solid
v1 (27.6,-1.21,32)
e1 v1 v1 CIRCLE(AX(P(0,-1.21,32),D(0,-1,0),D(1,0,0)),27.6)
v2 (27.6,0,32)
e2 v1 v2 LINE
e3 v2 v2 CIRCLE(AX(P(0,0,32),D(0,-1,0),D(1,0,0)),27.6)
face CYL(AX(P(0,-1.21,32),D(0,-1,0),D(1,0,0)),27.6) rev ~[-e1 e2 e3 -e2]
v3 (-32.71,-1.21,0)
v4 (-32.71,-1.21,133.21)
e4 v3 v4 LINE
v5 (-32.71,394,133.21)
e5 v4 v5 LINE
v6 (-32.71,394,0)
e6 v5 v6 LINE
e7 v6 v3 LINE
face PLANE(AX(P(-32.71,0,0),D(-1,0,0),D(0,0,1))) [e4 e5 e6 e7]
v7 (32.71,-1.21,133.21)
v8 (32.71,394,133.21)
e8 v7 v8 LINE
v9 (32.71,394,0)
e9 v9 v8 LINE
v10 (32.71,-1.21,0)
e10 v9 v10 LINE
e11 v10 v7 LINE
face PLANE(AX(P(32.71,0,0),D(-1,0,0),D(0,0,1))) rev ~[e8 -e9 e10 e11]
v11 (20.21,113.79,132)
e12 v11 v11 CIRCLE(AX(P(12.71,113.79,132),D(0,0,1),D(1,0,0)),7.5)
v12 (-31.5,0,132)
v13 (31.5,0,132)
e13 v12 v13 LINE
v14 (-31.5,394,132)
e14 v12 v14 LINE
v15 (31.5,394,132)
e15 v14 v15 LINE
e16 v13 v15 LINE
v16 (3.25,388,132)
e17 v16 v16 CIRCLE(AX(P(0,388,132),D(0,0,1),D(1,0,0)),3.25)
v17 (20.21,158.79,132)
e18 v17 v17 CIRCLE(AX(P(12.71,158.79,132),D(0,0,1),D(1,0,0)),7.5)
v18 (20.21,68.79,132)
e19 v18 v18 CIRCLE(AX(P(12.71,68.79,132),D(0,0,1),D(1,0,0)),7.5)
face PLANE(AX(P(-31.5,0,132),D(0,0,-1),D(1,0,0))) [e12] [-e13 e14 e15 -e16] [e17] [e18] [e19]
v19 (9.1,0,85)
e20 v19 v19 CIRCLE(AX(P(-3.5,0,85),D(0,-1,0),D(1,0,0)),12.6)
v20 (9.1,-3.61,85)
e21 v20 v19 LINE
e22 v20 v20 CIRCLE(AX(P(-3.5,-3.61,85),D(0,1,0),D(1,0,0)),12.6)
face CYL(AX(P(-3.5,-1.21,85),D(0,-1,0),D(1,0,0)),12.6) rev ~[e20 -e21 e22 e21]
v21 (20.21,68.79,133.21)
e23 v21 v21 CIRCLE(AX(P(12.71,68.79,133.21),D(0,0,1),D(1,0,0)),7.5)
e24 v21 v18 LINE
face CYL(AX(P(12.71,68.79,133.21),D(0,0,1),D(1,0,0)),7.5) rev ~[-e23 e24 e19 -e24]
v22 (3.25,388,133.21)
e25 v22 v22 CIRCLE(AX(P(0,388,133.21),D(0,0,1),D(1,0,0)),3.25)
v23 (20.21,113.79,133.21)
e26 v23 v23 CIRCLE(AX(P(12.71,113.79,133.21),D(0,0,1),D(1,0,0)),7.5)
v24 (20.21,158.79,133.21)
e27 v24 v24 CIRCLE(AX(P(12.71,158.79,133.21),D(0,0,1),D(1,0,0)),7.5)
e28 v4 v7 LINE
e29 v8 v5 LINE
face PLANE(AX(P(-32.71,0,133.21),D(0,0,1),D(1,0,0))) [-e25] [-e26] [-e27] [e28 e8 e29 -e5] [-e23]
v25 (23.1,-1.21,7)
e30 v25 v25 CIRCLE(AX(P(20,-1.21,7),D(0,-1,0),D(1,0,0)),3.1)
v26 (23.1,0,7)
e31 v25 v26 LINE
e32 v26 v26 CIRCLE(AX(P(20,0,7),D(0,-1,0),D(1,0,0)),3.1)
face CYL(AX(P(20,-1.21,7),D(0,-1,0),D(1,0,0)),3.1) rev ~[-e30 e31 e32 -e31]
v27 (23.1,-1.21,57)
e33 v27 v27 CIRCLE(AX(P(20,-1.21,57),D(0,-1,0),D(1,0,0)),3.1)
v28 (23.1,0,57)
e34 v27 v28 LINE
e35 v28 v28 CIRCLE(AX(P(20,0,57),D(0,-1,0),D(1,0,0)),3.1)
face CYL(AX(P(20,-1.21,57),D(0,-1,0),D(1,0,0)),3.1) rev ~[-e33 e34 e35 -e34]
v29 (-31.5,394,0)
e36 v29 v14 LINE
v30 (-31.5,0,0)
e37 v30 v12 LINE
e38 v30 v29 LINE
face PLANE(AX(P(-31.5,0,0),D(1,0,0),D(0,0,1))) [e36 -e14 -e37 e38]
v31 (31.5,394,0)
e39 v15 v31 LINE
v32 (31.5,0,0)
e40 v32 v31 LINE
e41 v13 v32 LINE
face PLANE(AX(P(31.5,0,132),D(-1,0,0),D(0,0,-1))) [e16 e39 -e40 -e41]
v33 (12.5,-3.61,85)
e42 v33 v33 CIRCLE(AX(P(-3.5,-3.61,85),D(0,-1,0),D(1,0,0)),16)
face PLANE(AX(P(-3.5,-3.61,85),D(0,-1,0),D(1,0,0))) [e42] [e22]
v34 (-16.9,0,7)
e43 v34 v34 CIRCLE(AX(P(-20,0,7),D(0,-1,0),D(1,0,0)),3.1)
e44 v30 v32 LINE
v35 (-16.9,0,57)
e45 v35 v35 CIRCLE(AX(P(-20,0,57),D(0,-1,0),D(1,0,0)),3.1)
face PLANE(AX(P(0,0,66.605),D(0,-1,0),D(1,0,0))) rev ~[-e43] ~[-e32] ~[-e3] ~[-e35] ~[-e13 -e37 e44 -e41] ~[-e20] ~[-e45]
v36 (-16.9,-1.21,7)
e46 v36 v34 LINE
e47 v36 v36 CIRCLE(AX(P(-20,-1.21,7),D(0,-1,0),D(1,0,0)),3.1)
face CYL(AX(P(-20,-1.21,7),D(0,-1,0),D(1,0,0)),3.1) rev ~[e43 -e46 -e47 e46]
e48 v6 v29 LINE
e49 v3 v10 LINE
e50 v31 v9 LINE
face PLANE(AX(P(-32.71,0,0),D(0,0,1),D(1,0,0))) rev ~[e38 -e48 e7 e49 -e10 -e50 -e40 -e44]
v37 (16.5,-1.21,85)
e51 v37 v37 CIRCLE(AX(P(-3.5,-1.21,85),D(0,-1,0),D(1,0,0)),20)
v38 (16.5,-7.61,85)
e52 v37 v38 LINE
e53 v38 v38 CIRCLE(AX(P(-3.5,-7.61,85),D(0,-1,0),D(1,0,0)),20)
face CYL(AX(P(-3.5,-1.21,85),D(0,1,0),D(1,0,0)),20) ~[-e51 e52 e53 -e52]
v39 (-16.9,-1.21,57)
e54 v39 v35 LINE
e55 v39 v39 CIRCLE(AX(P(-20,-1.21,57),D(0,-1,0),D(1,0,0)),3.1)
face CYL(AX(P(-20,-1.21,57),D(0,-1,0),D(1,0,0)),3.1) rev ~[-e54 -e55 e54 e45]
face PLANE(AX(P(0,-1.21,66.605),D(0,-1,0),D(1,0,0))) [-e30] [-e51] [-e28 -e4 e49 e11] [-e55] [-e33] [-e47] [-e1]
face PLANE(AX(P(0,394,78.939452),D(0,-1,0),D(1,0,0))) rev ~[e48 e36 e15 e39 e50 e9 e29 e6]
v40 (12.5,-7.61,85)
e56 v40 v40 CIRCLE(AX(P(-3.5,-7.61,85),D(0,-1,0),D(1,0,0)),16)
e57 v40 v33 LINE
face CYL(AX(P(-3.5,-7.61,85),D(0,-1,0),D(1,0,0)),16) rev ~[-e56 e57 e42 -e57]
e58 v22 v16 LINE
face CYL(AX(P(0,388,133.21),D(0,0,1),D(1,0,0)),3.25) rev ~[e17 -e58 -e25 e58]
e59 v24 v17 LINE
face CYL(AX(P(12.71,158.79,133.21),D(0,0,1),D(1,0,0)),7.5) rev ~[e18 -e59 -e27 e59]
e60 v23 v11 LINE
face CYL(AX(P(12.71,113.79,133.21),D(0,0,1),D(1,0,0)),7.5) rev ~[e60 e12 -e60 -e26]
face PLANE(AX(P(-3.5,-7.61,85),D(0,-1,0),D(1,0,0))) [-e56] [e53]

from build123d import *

# Parameters (mm, degrees)
F1_DEPTH      = 394
F2_W          = 65.42
F2_H          = 133.21
F3_DEPTH      = 1.21
F4_R          = 27.6
F5_DEPTH      = 395.211
F6_R          = 12.6
F7_DEPTH      = 395.211
F7_DEPTH_BACK = 628
F8_R          = 20
F8_R_2        = 12.6
F9_DEPTH      = 6.4
F11_R         = 7.5
F12_DEPTH     = 133.211
F13_R         = 3.25
F14_DEPTH     = 25
F10_R         = 16
F15_DEPTH     = 4
F16_R         = 3.1
F17_DEPTH     = 395.211


# Not quite as in the source:
# - an extrude ends at something that could not be found from the text; its depth is read off the source's solid


with BuildPart() as f1:
    # F0 (on Front) → F1 (new body)
    with BuildSketch(Plane.XZ):
        Polygon((-31.5, 132), (0, 132), (31.5, 132), (31.5, 0), (32.71, 0), (32.71, 133.21), (0, 133.21), (-32.71, 133.21), (-32.71, 0), (-31.5, 0), align=None)
    extrude(amount=-F1_DEPTH)

    # F2 (on face) → F3 (join)
    with BuildSketch(Plane.XZ):
        with Locations((0, 66.605)):
            Rectangle(F2_W, F2_H)
    extrude(amount=F3_DEPTH)

    # F4 (on face) → F5 (cut, through all)
    with BuildSketch(Plane.XZ.offset(1.21)):
        with Locations((0, 32)):
            Circle(F4_R)
    extrude(amount=-F5_DEPTH, mode=Mode.SUBTRACT)

    # F6 (on face) → F7 (cut, two sides)
    with BuildSketch(Plane.XZ.offset(1.21)) as f7_sk:
        with Locations((-3.5, 85)):
            Circle(F6_R)
    extrude(amount=-F7_DEPTH, mode=Mode.SUBTRACT)
    extrude(f7_sk.sketch, amount=F7_DEPTH_BACK, mode=Mode.SUBTRACT)

    # F8 (on face) → F9 (join)
    with BuildSketch(Plane.XZ.offset(1.21)):
        with Locations((-3.5, 85)):
            Circle(F8_R)
        with Locations((-3.5, 85)):
            Circle(F8_R_2, mode=Mode.SUBTRACT)
    extrude(amount=F9_DEPTH)

    # F11 (on face) → F12 (cut, through all)
    with BuildSketch(Plane.XY.offset(133.21)):
        with Locations((12.71, 68.79)):
            Circle(F11_R)
        with Locations((12.71, 113.79)):
            Circle(F11_R)
        with Locations((12.71, 158.79)):
            Circle(F11_R)
    extrude(amount=-F12_DEPTH, mode=Mode.SUBTRACT)

    # F13 (on face) → F14 (cut)
    with BuildSketch(Plane.XY.offset(133.21)):
        with Locations((0, 388)):
            Circle(F13_R)
    extrude(amount=-F14_DEPTH, mode=Mode.SUBTRACT)

    # F10 (on face) → F15 (cut)
    with BuildSketch(Plane.XZ.offset(7.61)):
        with Locations((-3.5, 85)):
            Circle(F10_R)
    extrude(amount=-F15_DEPTH, mode=Mode.SUBTRACT)

    # F16 (on face) → F17 (cut, through all)
    with BuildSketch(Plane.XZ.offset(1.21)):
        with Locations((20, 57)):
            Circle(F16_R)
        with Locations((-20, 57)):
            Circle(F16_R)
        with Locations((-20, 7)):
            Circle(F16_R)
        with Locations((20, 7)):
            Circle(F16_R)
    extrude(amount=-F17_DEPTH, mode=Mode.SUBTRACT)


solid = f1.part
